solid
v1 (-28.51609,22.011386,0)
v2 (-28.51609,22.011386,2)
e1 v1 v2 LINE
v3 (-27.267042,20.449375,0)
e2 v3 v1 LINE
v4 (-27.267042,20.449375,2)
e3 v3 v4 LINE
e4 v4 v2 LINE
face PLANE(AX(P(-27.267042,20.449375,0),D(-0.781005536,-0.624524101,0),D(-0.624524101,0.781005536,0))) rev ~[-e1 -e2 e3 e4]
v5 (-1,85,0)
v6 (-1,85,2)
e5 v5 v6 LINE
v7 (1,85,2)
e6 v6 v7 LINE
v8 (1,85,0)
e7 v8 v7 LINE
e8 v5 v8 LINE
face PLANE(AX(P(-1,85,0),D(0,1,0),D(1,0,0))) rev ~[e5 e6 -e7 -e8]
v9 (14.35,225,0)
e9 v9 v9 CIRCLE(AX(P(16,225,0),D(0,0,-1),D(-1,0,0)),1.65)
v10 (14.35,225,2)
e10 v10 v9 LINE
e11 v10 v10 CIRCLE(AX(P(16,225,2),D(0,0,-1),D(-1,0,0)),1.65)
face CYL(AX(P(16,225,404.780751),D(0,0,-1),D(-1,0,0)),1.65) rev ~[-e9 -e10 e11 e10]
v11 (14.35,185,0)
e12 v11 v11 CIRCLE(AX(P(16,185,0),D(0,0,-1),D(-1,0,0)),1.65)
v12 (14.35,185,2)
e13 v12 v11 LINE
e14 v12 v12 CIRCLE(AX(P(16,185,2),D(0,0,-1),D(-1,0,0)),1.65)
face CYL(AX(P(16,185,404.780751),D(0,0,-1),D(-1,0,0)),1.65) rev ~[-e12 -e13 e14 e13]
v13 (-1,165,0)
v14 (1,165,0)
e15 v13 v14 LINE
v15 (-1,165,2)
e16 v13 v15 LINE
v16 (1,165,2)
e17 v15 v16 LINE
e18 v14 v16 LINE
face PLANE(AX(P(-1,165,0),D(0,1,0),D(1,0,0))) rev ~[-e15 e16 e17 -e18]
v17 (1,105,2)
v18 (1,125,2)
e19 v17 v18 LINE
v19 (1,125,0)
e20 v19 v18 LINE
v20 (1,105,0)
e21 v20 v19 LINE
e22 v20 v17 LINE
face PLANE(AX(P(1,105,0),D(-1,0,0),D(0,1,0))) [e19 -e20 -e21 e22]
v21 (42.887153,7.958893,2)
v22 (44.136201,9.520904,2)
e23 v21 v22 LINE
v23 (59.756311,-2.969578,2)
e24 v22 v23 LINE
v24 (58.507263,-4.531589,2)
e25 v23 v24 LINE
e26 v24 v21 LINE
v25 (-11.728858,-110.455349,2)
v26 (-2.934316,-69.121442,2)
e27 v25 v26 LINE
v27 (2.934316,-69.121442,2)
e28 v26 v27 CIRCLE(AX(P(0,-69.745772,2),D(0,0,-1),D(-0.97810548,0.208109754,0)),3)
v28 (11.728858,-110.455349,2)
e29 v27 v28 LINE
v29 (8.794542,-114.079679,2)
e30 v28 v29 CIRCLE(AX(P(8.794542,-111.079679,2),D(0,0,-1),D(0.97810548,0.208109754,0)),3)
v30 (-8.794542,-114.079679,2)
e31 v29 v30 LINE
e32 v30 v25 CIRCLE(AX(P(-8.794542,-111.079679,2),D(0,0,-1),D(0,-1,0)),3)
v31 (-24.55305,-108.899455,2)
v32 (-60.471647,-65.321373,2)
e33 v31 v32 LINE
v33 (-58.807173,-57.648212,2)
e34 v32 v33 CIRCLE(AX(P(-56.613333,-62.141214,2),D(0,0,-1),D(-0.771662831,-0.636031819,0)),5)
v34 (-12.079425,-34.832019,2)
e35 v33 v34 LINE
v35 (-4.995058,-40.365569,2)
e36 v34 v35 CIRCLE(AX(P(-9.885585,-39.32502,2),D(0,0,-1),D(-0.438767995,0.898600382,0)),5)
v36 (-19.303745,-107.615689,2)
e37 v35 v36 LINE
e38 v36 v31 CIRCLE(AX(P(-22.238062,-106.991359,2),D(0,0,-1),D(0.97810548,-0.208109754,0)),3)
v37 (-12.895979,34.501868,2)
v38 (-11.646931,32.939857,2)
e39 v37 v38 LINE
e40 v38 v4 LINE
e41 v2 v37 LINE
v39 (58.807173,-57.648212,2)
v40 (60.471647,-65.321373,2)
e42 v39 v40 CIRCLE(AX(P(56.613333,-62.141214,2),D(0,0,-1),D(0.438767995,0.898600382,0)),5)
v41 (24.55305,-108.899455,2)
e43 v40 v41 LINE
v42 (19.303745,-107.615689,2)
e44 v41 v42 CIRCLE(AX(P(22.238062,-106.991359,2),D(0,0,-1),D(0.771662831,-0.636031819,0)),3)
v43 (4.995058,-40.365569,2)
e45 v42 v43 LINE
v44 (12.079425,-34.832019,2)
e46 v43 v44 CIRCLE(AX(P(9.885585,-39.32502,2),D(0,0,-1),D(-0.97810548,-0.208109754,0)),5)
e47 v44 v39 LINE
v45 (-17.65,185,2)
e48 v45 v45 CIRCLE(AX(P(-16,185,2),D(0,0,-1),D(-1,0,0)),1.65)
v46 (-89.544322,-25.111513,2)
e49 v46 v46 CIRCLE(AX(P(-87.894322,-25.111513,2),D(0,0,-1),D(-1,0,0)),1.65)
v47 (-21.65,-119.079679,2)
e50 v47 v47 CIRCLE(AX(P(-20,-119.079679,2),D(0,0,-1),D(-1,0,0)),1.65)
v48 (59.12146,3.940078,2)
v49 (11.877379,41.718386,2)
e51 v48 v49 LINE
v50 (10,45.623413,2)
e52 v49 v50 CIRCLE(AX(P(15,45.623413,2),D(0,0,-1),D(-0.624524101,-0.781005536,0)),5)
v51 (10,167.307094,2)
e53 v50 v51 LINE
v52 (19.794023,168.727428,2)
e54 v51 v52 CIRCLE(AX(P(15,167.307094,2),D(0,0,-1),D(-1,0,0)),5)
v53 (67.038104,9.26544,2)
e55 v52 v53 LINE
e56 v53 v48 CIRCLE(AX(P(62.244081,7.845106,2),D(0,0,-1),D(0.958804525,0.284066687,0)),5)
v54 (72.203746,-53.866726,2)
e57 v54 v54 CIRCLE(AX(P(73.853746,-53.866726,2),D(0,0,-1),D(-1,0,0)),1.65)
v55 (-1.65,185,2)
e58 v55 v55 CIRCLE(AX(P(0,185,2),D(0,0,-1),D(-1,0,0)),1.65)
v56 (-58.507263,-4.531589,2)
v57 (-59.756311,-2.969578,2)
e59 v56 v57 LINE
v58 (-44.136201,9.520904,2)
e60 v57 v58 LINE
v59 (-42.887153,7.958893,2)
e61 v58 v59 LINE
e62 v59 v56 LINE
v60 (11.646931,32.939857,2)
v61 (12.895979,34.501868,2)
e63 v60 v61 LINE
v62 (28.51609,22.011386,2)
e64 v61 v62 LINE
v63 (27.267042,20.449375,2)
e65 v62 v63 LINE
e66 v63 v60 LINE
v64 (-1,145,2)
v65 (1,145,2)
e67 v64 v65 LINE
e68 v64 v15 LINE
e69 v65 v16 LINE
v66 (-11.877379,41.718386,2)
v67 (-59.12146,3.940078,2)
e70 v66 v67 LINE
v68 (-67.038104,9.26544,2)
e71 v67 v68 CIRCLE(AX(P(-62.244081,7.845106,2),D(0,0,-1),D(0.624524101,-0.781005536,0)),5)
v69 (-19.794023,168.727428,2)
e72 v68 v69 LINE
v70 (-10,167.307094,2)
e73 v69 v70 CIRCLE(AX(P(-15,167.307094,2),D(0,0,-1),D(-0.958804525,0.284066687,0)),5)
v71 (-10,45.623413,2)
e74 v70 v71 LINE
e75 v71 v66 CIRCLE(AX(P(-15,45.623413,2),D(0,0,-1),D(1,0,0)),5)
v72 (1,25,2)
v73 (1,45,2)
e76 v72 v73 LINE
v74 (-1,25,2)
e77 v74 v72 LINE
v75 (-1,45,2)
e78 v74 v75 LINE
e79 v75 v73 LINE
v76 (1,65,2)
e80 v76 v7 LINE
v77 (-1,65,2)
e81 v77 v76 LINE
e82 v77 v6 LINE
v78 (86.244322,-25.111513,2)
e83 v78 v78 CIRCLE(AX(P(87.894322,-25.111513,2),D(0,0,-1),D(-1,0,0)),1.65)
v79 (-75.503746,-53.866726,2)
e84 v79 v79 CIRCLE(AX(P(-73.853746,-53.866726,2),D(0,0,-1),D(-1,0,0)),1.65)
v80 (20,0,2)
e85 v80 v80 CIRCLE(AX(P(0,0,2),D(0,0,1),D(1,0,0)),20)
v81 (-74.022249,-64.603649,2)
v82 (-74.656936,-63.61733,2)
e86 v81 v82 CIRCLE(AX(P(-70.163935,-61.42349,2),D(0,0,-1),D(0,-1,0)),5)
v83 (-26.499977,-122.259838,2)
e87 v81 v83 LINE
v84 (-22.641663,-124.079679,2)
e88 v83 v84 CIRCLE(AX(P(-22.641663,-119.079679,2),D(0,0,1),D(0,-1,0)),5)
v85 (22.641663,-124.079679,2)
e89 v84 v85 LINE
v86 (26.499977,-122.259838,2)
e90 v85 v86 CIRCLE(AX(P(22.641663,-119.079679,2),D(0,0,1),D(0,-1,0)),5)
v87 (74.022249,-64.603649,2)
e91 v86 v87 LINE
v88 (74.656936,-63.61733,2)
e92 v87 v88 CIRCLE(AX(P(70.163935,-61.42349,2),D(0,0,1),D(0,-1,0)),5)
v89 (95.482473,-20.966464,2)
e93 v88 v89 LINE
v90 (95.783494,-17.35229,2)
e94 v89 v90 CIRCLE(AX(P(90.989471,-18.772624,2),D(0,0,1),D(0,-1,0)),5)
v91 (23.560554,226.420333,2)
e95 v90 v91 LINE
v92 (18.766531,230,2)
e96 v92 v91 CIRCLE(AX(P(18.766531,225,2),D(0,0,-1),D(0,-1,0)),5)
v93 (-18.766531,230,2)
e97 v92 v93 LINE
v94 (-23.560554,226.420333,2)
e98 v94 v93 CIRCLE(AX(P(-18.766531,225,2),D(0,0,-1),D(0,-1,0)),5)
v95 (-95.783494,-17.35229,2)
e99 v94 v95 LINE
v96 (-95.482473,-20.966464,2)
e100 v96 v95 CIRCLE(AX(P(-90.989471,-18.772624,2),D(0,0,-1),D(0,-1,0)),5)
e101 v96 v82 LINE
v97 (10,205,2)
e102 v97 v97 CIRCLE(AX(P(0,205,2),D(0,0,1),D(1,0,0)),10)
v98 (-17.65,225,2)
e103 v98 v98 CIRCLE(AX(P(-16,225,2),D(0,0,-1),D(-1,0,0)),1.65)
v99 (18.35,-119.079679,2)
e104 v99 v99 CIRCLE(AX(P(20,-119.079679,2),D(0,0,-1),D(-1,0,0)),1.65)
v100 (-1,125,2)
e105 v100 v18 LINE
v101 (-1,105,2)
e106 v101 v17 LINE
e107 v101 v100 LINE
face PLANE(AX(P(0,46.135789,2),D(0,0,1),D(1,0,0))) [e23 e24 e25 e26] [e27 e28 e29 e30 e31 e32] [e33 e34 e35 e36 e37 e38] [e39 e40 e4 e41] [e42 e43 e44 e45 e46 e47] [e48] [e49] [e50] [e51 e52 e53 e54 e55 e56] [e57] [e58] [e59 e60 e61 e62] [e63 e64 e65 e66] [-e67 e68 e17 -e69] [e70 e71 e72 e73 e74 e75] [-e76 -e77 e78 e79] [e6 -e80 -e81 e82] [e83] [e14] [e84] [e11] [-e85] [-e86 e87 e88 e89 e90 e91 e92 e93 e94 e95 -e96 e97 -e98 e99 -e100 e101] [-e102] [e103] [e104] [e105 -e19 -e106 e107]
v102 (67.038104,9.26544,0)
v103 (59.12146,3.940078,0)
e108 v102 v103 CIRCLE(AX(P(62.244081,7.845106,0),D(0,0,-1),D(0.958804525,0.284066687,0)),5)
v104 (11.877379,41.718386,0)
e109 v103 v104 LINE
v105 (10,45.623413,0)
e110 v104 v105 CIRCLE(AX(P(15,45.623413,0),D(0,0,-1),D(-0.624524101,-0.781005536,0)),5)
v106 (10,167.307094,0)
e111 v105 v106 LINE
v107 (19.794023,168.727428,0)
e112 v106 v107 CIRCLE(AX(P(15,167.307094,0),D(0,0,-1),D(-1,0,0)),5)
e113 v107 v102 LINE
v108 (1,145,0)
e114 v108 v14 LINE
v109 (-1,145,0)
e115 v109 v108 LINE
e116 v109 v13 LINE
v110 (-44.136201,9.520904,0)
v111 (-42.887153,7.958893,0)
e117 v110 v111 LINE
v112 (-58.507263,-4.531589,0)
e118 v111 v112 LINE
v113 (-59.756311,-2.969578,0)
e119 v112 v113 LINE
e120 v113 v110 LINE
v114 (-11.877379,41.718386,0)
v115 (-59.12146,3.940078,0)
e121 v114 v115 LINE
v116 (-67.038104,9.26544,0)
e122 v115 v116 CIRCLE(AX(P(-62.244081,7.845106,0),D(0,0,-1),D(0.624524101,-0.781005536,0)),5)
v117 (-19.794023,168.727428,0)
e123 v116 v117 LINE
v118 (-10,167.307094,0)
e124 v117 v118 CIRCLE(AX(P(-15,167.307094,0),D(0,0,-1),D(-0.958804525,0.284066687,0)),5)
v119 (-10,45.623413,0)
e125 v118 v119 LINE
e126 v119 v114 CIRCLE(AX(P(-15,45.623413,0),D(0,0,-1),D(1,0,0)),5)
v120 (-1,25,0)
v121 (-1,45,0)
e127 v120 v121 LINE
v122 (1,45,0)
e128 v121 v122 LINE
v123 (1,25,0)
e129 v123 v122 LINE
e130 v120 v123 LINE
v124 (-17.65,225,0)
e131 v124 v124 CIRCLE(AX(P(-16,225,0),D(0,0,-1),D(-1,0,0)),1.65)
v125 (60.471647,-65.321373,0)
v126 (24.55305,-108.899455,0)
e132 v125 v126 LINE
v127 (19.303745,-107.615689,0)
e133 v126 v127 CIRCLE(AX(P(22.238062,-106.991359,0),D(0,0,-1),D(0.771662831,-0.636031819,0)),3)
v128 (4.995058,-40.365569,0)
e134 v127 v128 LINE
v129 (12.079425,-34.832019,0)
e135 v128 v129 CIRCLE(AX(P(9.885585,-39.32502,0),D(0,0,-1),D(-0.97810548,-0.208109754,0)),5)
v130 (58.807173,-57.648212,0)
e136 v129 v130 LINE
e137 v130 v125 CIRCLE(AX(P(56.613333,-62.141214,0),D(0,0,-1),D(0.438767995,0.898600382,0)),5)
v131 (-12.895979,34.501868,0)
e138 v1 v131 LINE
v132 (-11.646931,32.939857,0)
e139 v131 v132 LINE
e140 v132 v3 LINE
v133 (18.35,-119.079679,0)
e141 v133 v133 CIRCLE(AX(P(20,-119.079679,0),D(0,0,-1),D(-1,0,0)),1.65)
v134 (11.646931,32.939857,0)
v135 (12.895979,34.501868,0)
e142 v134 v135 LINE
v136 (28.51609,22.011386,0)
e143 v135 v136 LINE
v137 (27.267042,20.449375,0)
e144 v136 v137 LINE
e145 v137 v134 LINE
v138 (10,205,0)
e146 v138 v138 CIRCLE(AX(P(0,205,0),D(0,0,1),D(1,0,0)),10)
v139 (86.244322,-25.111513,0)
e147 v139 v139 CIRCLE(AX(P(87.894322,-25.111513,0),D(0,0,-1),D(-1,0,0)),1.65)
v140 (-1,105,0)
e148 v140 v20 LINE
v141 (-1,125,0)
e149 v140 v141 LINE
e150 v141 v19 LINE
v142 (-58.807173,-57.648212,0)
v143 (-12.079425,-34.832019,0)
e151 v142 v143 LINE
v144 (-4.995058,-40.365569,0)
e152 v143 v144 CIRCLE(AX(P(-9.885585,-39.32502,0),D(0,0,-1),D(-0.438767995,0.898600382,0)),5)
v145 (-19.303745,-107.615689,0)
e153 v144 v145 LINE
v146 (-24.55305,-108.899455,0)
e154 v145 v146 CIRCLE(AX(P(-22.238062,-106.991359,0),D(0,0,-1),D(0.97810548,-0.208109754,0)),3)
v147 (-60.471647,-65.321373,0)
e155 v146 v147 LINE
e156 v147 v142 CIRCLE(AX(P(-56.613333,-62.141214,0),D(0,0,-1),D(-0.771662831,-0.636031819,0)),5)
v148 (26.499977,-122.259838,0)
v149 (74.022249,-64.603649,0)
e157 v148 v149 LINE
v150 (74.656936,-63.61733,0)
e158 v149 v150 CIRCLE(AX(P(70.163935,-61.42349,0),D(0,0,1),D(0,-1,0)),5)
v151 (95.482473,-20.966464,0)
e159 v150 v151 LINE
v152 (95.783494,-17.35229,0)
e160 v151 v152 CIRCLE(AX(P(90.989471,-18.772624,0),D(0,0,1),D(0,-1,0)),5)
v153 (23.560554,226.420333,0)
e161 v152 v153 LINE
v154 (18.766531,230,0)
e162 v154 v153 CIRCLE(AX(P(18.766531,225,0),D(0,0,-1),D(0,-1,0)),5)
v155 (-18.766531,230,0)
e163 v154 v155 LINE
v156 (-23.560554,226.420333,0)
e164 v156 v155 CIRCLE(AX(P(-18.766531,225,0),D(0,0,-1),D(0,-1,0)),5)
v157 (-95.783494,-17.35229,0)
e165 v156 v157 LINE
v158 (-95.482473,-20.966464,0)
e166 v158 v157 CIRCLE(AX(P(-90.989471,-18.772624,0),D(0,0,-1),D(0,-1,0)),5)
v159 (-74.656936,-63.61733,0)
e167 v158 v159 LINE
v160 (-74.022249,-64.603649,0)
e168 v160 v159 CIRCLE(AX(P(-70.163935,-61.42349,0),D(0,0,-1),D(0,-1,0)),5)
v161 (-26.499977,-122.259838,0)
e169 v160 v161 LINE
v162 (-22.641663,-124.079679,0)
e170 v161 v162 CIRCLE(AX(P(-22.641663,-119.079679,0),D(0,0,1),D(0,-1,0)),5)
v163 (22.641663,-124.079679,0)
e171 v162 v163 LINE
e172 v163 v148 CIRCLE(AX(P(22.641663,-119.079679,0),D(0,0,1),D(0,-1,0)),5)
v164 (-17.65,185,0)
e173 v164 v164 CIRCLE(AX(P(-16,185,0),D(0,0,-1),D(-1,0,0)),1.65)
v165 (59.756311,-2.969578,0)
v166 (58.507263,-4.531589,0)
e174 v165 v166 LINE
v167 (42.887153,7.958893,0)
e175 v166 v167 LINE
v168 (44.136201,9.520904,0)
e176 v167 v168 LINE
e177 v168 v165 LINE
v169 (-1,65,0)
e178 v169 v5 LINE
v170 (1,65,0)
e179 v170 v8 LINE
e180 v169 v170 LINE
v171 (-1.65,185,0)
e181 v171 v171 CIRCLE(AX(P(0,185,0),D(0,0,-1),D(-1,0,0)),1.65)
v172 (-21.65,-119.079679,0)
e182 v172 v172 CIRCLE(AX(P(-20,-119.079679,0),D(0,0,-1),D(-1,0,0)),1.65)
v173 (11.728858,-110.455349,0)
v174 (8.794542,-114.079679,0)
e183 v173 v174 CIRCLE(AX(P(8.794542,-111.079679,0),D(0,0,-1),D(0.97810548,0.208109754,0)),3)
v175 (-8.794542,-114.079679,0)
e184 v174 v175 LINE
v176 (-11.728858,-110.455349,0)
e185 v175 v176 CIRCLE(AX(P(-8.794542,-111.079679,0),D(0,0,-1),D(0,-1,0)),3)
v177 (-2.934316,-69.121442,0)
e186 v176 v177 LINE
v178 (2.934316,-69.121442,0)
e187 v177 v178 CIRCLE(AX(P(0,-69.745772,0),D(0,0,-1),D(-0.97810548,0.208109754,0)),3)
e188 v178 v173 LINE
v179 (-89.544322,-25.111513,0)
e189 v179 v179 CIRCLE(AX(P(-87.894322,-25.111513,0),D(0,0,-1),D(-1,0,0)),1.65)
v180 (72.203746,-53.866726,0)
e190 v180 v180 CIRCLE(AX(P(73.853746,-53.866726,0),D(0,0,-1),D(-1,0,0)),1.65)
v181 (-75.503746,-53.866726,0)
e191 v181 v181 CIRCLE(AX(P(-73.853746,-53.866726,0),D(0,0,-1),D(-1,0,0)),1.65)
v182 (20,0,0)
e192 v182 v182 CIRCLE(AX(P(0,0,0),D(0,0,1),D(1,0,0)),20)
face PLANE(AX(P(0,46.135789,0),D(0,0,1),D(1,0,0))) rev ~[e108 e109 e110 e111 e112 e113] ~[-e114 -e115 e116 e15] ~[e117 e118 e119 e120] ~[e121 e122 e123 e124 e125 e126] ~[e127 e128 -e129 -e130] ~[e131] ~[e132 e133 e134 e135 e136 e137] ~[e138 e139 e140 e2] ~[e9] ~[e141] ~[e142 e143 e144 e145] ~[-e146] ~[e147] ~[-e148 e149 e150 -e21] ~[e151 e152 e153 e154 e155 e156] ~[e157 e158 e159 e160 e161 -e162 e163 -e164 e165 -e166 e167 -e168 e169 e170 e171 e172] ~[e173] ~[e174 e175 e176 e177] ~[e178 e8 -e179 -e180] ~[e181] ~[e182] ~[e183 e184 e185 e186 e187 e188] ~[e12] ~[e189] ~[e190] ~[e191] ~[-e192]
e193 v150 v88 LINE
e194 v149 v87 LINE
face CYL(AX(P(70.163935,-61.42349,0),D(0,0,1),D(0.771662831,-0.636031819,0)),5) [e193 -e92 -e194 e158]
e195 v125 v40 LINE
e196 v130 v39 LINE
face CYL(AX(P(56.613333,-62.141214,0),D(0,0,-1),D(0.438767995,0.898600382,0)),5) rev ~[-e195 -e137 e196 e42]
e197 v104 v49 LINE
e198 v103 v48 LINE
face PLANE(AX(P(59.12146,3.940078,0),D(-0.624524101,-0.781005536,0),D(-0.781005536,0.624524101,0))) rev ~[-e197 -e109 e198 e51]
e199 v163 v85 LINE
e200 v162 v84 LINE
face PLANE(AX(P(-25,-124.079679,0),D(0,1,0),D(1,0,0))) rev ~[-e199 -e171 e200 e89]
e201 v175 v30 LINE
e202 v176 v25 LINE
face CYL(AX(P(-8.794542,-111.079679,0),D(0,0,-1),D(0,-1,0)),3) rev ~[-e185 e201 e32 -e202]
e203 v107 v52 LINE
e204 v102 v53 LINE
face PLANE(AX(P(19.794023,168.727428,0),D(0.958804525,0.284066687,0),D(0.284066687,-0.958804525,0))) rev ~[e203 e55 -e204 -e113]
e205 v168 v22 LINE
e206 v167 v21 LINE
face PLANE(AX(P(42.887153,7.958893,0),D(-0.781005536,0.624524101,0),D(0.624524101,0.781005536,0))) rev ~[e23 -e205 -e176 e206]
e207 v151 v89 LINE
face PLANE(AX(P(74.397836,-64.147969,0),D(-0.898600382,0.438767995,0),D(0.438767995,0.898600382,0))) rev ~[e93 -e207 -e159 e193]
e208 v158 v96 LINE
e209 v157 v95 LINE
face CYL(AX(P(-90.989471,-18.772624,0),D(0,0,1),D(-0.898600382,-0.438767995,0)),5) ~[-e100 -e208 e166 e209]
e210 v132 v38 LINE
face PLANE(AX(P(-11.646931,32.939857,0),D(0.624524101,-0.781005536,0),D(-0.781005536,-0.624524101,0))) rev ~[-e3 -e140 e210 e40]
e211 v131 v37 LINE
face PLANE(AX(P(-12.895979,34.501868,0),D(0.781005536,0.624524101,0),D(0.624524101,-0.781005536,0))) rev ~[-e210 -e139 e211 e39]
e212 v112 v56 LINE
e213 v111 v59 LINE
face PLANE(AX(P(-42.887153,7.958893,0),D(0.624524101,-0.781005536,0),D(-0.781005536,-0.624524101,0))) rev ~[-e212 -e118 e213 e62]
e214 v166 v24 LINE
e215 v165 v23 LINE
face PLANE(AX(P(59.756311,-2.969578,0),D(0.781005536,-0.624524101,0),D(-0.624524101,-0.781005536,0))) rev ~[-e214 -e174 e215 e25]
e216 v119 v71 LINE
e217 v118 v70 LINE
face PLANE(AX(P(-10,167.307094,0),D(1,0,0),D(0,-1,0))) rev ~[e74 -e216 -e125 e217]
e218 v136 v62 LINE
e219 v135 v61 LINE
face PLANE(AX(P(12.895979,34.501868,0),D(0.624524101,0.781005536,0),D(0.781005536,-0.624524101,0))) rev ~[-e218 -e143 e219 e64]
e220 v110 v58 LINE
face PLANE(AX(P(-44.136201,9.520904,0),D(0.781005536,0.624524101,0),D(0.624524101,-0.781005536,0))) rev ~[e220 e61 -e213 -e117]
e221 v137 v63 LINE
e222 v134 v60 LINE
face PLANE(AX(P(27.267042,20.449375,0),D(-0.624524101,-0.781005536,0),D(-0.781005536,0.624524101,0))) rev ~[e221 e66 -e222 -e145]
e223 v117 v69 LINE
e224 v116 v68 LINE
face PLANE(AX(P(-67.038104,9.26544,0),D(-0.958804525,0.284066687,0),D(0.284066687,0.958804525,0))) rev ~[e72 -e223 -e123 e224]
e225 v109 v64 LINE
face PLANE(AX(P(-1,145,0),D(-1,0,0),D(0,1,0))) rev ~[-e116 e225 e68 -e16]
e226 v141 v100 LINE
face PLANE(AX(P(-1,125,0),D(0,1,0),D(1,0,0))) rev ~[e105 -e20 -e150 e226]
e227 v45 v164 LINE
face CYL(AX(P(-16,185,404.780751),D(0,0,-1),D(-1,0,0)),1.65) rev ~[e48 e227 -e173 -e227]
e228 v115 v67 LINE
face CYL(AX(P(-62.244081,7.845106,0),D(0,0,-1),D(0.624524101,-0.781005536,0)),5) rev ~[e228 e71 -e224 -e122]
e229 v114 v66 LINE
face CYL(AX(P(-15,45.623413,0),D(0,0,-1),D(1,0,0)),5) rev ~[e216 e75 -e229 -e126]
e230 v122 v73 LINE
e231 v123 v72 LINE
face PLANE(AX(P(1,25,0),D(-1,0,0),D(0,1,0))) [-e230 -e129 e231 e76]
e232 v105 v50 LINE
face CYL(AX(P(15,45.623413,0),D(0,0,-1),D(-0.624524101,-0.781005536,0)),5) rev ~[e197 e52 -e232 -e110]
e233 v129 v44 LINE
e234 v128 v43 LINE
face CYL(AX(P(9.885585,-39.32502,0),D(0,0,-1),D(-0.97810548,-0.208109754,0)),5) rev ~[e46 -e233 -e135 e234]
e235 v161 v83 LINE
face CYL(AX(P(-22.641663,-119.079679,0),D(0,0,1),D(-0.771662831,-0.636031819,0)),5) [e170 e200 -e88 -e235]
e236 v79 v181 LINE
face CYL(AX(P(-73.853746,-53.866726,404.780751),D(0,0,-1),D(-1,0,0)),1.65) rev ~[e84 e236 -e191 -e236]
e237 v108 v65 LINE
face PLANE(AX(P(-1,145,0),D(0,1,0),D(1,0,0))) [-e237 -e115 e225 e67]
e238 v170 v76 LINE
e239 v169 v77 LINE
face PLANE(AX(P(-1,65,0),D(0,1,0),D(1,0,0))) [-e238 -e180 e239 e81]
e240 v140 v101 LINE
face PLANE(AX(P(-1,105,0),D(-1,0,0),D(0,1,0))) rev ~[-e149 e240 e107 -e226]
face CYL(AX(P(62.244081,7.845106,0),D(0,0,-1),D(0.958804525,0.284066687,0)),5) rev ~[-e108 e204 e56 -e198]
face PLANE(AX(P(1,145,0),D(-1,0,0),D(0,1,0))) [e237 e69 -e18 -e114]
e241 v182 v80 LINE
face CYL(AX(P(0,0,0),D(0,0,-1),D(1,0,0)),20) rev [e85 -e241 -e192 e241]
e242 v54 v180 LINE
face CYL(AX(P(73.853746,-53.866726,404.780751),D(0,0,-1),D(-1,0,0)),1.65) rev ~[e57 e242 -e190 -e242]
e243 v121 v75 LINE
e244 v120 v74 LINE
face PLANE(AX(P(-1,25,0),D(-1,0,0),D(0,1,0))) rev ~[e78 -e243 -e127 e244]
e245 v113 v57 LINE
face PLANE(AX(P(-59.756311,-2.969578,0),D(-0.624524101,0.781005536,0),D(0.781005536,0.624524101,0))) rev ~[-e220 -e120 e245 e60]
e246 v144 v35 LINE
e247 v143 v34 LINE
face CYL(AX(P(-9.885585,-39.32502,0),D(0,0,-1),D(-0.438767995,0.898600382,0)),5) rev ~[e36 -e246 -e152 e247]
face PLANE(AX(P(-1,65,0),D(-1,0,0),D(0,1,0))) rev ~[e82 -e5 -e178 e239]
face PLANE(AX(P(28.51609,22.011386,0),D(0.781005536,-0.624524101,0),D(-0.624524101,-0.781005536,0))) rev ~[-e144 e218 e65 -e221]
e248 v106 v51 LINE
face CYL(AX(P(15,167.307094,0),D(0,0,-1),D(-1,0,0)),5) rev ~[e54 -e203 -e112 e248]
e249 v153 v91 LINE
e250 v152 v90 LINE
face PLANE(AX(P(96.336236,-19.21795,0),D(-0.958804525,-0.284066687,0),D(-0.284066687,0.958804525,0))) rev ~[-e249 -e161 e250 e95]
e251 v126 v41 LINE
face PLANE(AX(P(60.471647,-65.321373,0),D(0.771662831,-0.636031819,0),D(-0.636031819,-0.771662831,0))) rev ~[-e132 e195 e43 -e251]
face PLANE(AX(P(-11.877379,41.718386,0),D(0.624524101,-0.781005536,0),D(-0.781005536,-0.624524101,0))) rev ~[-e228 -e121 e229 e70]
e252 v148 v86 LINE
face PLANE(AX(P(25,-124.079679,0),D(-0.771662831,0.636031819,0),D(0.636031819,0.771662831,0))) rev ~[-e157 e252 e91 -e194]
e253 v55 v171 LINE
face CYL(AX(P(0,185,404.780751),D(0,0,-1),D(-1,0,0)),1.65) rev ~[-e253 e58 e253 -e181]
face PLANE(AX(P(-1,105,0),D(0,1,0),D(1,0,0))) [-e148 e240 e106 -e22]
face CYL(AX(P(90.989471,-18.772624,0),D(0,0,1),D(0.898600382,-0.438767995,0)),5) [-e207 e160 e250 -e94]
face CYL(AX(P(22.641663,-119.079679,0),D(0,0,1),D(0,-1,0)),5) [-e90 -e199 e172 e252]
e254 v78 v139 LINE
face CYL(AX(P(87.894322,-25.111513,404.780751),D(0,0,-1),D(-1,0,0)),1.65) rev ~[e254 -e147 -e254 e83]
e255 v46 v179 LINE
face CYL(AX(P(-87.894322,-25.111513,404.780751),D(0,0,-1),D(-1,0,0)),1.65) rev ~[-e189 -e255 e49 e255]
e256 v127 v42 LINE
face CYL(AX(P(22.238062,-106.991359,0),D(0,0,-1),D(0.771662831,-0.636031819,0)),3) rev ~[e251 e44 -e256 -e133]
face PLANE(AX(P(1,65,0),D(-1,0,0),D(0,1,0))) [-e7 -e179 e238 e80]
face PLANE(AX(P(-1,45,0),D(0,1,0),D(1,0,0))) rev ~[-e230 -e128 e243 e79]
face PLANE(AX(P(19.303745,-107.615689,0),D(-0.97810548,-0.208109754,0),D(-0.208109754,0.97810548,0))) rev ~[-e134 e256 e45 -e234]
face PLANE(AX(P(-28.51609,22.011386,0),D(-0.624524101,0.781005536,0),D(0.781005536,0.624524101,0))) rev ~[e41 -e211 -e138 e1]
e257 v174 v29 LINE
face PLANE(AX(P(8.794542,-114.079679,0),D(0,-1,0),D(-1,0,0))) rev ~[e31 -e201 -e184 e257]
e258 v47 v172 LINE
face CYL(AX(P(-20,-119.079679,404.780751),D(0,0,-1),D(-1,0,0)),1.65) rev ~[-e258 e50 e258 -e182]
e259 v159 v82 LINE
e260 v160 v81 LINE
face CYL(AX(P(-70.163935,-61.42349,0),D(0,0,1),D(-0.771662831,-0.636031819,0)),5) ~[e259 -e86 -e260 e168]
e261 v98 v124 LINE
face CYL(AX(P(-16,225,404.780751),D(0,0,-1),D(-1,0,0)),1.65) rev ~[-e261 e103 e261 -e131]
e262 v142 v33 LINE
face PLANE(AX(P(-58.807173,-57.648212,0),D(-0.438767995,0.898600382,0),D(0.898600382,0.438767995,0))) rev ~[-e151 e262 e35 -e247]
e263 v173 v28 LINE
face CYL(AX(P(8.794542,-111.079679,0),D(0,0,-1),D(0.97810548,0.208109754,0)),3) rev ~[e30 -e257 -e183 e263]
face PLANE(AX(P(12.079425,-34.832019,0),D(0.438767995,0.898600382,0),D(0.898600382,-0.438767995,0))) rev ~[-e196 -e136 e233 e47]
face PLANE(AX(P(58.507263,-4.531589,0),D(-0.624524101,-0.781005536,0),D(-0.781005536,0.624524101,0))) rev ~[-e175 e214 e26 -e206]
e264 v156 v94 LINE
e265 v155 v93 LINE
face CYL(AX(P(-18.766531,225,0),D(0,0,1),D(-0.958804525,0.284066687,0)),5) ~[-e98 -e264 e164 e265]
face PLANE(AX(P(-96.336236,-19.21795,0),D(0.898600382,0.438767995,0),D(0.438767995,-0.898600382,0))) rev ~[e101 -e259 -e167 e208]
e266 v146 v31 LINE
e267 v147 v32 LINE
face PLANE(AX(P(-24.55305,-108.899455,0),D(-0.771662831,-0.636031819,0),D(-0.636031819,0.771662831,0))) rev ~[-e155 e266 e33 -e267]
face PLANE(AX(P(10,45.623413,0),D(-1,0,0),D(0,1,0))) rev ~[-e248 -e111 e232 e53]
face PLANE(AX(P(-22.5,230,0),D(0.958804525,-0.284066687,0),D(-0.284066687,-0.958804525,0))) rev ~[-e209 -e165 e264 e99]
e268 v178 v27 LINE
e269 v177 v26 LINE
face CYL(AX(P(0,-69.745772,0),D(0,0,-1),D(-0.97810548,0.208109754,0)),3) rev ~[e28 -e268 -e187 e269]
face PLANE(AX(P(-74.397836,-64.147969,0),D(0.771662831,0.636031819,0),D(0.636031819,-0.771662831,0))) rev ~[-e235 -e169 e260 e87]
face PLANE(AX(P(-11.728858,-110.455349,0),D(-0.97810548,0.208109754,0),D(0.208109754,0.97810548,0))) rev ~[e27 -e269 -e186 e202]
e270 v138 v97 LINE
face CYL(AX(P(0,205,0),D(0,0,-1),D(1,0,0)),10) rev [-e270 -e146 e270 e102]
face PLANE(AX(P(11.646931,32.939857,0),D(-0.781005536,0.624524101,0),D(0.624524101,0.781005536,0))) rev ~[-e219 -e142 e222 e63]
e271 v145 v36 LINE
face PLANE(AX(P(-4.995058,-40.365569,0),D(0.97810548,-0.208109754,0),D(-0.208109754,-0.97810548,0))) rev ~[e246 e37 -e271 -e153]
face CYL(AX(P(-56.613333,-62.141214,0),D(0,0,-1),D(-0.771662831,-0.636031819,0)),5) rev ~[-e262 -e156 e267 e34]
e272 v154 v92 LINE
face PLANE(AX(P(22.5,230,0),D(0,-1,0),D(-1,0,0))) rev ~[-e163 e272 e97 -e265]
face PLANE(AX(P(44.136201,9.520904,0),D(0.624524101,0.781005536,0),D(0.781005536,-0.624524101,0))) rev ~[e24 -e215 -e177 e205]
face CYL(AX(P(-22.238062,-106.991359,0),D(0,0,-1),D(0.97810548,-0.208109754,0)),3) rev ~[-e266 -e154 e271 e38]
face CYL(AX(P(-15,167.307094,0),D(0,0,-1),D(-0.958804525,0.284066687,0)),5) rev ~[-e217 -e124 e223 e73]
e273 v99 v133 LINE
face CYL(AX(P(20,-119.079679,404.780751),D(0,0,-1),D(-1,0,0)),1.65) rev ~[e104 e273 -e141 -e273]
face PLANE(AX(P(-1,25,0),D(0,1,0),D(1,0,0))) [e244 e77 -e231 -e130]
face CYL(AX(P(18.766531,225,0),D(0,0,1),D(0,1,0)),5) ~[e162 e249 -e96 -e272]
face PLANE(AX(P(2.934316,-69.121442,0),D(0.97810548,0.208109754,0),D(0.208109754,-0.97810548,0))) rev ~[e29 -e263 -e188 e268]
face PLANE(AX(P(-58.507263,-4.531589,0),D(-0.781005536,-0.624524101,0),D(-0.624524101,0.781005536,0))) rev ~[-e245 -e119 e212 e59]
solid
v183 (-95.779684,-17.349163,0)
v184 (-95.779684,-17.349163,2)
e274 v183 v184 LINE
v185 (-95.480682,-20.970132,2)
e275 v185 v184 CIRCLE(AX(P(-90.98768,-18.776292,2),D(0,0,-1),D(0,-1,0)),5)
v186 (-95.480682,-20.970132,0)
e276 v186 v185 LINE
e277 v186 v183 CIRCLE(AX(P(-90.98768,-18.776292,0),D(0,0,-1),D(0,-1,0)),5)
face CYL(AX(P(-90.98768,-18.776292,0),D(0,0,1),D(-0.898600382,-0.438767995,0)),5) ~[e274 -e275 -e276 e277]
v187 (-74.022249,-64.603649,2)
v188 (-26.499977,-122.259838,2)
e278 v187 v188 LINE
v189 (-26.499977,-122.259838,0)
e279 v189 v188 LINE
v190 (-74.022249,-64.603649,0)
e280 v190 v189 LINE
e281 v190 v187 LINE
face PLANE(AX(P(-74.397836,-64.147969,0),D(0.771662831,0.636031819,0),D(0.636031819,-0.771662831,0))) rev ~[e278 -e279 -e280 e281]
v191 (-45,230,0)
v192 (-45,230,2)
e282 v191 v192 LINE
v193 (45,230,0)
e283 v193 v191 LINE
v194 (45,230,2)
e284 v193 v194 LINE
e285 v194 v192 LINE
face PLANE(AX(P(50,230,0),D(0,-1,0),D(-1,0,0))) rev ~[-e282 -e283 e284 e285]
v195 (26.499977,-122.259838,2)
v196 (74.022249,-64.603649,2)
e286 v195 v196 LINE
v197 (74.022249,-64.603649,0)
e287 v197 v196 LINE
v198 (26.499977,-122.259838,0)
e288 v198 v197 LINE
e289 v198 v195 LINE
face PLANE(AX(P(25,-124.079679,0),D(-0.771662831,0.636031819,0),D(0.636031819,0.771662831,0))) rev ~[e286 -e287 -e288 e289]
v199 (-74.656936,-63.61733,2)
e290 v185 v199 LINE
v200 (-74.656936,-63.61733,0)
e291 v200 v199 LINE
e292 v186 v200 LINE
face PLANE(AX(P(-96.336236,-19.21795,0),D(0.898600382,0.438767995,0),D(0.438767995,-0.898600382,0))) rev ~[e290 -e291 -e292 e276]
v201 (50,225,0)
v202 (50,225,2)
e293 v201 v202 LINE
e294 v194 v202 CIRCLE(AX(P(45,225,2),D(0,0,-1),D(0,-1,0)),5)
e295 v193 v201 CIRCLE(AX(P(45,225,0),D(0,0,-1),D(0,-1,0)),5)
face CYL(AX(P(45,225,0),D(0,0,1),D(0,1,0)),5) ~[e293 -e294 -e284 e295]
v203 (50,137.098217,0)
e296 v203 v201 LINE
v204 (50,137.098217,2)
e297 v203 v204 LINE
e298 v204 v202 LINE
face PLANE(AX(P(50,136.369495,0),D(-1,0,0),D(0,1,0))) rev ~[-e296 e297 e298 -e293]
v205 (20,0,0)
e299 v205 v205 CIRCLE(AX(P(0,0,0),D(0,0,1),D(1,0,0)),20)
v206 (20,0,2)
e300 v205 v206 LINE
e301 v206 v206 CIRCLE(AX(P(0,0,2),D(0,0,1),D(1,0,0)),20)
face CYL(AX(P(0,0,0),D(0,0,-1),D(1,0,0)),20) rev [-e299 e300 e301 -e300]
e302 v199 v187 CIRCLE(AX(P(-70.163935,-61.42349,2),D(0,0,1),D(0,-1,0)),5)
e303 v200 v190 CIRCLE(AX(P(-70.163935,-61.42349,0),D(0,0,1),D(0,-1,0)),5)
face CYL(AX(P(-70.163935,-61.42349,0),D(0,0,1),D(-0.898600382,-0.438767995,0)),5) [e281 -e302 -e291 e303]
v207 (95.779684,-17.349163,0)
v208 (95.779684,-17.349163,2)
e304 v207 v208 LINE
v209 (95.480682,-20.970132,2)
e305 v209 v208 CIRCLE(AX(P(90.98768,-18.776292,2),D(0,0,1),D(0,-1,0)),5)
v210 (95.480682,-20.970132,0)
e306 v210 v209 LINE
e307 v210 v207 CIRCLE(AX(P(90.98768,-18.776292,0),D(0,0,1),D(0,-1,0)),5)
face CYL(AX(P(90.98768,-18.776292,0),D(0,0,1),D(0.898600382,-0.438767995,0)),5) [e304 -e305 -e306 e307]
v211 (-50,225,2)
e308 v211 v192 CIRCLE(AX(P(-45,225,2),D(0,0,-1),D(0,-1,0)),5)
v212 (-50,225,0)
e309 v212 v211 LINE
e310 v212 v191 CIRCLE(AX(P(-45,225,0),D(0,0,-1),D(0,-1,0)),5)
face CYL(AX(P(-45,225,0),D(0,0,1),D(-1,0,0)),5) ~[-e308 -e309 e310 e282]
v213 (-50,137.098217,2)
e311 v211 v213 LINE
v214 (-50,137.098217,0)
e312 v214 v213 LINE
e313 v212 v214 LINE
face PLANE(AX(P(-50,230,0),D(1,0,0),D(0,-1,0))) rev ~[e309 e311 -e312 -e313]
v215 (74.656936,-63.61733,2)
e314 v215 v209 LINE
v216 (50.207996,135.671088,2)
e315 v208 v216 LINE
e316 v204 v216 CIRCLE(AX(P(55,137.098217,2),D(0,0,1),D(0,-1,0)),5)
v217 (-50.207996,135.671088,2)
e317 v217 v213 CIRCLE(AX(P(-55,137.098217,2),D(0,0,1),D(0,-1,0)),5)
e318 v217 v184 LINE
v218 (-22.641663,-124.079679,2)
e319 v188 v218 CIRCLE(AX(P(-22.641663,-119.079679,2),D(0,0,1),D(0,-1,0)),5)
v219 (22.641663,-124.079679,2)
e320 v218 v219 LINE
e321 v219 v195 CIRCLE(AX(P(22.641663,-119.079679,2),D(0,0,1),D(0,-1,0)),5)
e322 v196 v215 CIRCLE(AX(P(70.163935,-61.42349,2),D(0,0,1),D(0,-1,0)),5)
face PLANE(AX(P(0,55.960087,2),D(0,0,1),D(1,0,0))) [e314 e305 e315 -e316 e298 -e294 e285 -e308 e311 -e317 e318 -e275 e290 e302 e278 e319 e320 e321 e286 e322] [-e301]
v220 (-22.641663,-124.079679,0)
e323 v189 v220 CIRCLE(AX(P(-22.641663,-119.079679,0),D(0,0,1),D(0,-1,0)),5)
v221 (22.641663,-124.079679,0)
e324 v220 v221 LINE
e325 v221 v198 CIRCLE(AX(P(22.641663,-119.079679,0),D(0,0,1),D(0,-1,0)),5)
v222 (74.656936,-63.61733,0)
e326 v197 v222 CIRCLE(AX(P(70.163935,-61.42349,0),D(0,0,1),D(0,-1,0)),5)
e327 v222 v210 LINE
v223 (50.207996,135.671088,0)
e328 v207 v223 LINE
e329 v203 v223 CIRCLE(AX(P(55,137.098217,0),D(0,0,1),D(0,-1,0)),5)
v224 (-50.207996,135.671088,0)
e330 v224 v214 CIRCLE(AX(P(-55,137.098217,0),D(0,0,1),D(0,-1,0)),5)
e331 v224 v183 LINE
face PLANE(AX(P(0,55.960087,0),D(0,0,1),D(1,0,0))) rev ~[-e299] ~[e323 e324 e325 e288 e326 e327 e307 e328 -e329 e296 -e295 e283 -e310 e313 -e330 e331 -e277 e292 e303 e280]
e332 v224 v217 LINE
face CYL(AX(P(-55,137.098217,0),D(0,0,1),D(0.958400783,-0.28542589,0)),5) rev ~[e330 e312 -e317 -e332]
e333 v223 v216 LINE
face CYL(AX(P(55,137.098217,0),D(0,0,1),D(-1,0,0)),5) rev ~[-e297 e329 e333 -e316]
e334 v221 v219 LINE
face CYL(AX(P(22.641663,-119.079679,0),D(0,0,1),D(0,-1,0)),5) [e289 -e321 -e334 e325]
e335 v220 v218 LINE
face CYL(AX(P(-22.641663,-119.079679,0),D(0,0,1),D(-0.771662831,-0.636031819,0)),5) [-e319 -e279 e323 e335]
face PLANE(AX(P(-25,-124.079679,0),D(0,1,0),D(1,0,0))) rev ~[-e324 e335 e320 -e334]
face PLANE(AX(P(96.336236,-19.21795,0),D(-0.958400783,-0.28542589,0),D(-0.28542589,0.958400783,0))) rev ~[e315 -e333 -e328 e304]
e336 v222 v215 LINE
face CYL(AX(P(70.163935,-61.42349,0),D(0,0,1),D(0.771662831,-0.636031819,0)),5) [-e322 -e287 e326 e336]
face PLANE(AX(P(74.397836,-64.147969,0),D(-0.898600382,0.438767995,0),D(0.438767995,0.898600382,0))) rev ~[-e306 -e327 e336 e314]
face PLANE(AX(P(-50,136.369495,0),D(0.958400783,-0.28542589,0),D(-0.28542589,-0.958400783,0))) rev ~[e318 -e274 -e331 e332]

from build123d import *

# Parameters (mm, degrees)
F1_R     = 20
F1_W     = 2
F1_H     = 20
F1_R_2   = 10
F2_DEPTH = 2
F3_R     = 5
F5_D     = 3.3
F6_R     = 20
F7_DEPTH = 2
F8_R     = 5


with BuildPart() as f2:
    # F1 (on Top) → F2 (new body)
    with BuildSketch(Plane.XY):
        Polygon((-74.397836401, -64.1479690937), (-25, -124.0796787573), (25, -124.0796787573), (74.397836401, -64.1479690937), (96.336236162, -19.2179499982), (22.5, 230), (-22.5, 230), (-96.336236162, -19.2179499982), align=None)
        with BuildLine():
            Line((-24.5530502594, -108.8994547314), (-60.4716474798, -65.321373241))
            ThreePointArc((-60.4716474798, -65.321373241), (-61.4996911033, -61.081257714), (-58.8071732987, -57.6482122372))
            Line((-58.8071732987, -57.6482122372), (-12.0794250934, -34.8320185054))
            ThreePointArc((-12.0794250934, -34.8320185054), (-6.8077487763, -35.3845986788), (-4.9950577161, -40.3655691827))
            Line((-4.9950577161, -40.3655691827), (-19.3037453244, -107.6156885355))
            ThreePointArc((-19.3037453244, -107.6156885355), (-21.5253867426, -109.9054790926), (-24.5530502594, -108.8994547314))
        make_face(mode=Mode.SUBTRACT)
        Polygon((-59.7563114694, -2.9695777864), (-44.1362007471, 9.5209042308), (-42.8871525454, 7.9588931586), (-58.5072632677, -4.5315888586), align=None, mode=Mode.SUBTRACT)
        Polygon((-11.6469311007, 32.9398571929), (-27.267041823, 20.4493751757), (-28.5160900247, 22.011386248), (-12.8959793024, 34.5018682652), align=None, mode=Mode.SUBTRACT)
        with BuildLine():
            Line((-11.7288579458, -110.4553494967), (-2.9343164407, -69.1214422886))
            ThreePointArc((-2.9343164407, -69.1214422886), (0, -66.7457715493), (2.9343164407, -69.1214422886))
            Line((2.9343164407, -69.1214422886), (11.7288579458, -110.4553494967))
            ThreePointArc((11.7288579458, -110.4553494967), (11.126170526, -112.9674038721), (8.7945415051, -114.0796787573))
            Line((8.7945415051, -114.0796787573), (-8.7945415051, -114.0796787573))
            ThreePointArc((-8.7945415051, -114.0796787573), (-11.126170526, -112.9674038721), (-11.7288579458, -110.4553494967))
        make_face(mode=Mode.SUBTRACT)
        with BuildLine():
            ThreePointArc((58.8071732987, -57.6482122372), (61.4996911033, -61.081257714), (60.4716474798, -65.321373241))
            Line((60.4716474798, -65.321373241), (24.5530502594, -108.8994547314))
            ThreePointArc((24.5530502594, -108.8994547314), (21.5253867426, -109.9054790926), (19.3037453244, -107.6156885355))
            Line((19.3037453244, -107.6156885355), (4.9950577161, -40.3655691827))
            ThreePointArc((4.9950577161, -40.3655691827), (6.8077487763, -35.3845986788), (12.0794250934, -34.8320185054))
            Line((12.0794250934, -34.8320185054), (58.8071732987, -57.6482122372))
        make_face(mode=Mode.SUBTRACT)
        Circle(F1_R, mode=Mode.SUBTRACT)
        Polygon((11.6469311007, 32.9398571929), (12.8959793024, 34.5018682652), (28.5160900247, 22.011386248), (27.267041823, 20.4493751757), align=None, mode=Mode.SUBTRACT)
        with Locations((0, 35)):
            Rectangle(F1_W, F1_H, mode=Mode.SUBTRACT)
        Polygon((44.1362007471, 9.5209042308), (59.7563114694, -2.9695777864), (58.5072632677, -4.5315888586), (42.8871525454, 7.9588931586), align=None, mode=Mode.SUBTRACT)
        with BuildLine():
            Line((-67.0381035794, 9.2654395509), (-19.7940226257, 168.7274275506))
            ThreePointArc((-19.7940226257, 168.7274275506), (-14.2824044066, 172.2553318396), (-10, 167.3070941165))
            Line((-10, 167.3070941165), (-10, 45.6234134578))
            ThreePointArc((-10, 45.6234134578), (-10.4937209074, 43.4569765814), (-11.8773794957, 41.7183857772))
            Line((-11.8773794957, 41.7183857772), (-59.1214604493, 3.9400784362))
            ThreePointArc((-59.1214604493, 3.9400784362), (-65.0348270928, 3.6964031886), (-67.0381035794, 9.2654395509))
        make_face(mode=Mode.SUBTRACT)
        with Locations((0, 75)):
            Rectangle(F1_W, F1_H, mode=Mode.SUBTRACT)
        with BuildLine():
            ThreePointArc((11.8773794957, 41.7183857772), (10.4937209074, 43.4569765814), (10, 45.6234134578))
            Line((10, 45.6234134578), (10, 167.3070941165))
            ThreePointArc((10, 167.3070941165), (14.2824044066, 172.2553318396), (19.7940226257, 168.7274275506))
            Line((19.7940226257, 168.7274275506), (67.0381035794, 9.2654395509))
            ThreePointArc((67.0381035794, 9.2654395509), (65.0348270928, 3.6964031886), (59.1214604493, 3.9400784362))
            Line((59.1214604493, 3.9400784362), (11.8773794957, 41.7183857772))
        make_face(mode=Mode.SUBTRACT)
        with Locations((0, 115)):
            Rectangle(F1_W, F1_H, mode=Mode.SUBTRACT)
        with Locations((0, 155)):
            Rectangle(F1_W, F1_H, mode=Mode.SUBTRACT)
        with Locations((0, 205)):
            Circle(F1_R_2, mode=Mode.SUBTRACT)
    extrude(amount=F2_DEPTH)

    # F3
    f3_edges = [f2.edges().sort_by_distance(p)[0] for p in [
        (-25, -124.079679, 1),
        (25, -124.079679, 1),
        (-74.397836, -64.147969, 1),
        (-96.336236, -19.21795, 1),
        (74.397836, -64.147969, 1),
        (96.336236, -19.21795, 1),
        (22.5, 230, 1),
        (-22.5, 230, 1),
    ]]
    fillet(f3_edges, radius=F3_R)

    # F5 (through all)
    with Locations(Plane.XY.offset(2)):
        with Locations((-16, 185), (16, 185), (0, 185), (16, 225), (-16, 225), (-87.8943222955, -25.1115134593), (-73.8537464484, -53.8667256804), (-20, -119.0796787573), (20, -119.0796787573), (73.8537464484, -53.8667256804), (87.8943222955, -25.1115134593)):
            Hole(F5_D / 2)


with BuildPart() as f7:
    # F6 (on Top) → F7 (new body)
    with BuildSketch(Plane.XY):
        Polygon((-96.336236162, -19.2179499982), (-74.397836401, -64.1479690937), (-25, -124.0796787573), (25, -124.0796787573), (74.397836401, -64.1479690937), (96.336236162, -19.2179499982), (50, 136.3694951899), (50, 230), (-50, 230), (-50, 136.3694951899), align=None)
        Circle(F6_R, mode=Mode.SUBTRACT)
    extrude(amount=F7_DEPTH)

    # F8
    f8_edges = [f7.edges().sort_by_distance(p)[0] for p in [
        (25, -124.079679, 1),
        (-25, -124.079679, 1),
        (74.397836, -64.147969, 1),
        (96.336236, -19.21795, 1),
        (-74.397836, -64.147969, 1),
        (-96.336236, -19.21795, 1),
        (-50, 136.369495, 1),
        (50, 136.369495, 1),
        (50, 230, 1),
        (-50, 230, 1),
    ]]
    fillet(f8_edges, radius=F8_R)


solid = Compound([f2.part, f7.part])
